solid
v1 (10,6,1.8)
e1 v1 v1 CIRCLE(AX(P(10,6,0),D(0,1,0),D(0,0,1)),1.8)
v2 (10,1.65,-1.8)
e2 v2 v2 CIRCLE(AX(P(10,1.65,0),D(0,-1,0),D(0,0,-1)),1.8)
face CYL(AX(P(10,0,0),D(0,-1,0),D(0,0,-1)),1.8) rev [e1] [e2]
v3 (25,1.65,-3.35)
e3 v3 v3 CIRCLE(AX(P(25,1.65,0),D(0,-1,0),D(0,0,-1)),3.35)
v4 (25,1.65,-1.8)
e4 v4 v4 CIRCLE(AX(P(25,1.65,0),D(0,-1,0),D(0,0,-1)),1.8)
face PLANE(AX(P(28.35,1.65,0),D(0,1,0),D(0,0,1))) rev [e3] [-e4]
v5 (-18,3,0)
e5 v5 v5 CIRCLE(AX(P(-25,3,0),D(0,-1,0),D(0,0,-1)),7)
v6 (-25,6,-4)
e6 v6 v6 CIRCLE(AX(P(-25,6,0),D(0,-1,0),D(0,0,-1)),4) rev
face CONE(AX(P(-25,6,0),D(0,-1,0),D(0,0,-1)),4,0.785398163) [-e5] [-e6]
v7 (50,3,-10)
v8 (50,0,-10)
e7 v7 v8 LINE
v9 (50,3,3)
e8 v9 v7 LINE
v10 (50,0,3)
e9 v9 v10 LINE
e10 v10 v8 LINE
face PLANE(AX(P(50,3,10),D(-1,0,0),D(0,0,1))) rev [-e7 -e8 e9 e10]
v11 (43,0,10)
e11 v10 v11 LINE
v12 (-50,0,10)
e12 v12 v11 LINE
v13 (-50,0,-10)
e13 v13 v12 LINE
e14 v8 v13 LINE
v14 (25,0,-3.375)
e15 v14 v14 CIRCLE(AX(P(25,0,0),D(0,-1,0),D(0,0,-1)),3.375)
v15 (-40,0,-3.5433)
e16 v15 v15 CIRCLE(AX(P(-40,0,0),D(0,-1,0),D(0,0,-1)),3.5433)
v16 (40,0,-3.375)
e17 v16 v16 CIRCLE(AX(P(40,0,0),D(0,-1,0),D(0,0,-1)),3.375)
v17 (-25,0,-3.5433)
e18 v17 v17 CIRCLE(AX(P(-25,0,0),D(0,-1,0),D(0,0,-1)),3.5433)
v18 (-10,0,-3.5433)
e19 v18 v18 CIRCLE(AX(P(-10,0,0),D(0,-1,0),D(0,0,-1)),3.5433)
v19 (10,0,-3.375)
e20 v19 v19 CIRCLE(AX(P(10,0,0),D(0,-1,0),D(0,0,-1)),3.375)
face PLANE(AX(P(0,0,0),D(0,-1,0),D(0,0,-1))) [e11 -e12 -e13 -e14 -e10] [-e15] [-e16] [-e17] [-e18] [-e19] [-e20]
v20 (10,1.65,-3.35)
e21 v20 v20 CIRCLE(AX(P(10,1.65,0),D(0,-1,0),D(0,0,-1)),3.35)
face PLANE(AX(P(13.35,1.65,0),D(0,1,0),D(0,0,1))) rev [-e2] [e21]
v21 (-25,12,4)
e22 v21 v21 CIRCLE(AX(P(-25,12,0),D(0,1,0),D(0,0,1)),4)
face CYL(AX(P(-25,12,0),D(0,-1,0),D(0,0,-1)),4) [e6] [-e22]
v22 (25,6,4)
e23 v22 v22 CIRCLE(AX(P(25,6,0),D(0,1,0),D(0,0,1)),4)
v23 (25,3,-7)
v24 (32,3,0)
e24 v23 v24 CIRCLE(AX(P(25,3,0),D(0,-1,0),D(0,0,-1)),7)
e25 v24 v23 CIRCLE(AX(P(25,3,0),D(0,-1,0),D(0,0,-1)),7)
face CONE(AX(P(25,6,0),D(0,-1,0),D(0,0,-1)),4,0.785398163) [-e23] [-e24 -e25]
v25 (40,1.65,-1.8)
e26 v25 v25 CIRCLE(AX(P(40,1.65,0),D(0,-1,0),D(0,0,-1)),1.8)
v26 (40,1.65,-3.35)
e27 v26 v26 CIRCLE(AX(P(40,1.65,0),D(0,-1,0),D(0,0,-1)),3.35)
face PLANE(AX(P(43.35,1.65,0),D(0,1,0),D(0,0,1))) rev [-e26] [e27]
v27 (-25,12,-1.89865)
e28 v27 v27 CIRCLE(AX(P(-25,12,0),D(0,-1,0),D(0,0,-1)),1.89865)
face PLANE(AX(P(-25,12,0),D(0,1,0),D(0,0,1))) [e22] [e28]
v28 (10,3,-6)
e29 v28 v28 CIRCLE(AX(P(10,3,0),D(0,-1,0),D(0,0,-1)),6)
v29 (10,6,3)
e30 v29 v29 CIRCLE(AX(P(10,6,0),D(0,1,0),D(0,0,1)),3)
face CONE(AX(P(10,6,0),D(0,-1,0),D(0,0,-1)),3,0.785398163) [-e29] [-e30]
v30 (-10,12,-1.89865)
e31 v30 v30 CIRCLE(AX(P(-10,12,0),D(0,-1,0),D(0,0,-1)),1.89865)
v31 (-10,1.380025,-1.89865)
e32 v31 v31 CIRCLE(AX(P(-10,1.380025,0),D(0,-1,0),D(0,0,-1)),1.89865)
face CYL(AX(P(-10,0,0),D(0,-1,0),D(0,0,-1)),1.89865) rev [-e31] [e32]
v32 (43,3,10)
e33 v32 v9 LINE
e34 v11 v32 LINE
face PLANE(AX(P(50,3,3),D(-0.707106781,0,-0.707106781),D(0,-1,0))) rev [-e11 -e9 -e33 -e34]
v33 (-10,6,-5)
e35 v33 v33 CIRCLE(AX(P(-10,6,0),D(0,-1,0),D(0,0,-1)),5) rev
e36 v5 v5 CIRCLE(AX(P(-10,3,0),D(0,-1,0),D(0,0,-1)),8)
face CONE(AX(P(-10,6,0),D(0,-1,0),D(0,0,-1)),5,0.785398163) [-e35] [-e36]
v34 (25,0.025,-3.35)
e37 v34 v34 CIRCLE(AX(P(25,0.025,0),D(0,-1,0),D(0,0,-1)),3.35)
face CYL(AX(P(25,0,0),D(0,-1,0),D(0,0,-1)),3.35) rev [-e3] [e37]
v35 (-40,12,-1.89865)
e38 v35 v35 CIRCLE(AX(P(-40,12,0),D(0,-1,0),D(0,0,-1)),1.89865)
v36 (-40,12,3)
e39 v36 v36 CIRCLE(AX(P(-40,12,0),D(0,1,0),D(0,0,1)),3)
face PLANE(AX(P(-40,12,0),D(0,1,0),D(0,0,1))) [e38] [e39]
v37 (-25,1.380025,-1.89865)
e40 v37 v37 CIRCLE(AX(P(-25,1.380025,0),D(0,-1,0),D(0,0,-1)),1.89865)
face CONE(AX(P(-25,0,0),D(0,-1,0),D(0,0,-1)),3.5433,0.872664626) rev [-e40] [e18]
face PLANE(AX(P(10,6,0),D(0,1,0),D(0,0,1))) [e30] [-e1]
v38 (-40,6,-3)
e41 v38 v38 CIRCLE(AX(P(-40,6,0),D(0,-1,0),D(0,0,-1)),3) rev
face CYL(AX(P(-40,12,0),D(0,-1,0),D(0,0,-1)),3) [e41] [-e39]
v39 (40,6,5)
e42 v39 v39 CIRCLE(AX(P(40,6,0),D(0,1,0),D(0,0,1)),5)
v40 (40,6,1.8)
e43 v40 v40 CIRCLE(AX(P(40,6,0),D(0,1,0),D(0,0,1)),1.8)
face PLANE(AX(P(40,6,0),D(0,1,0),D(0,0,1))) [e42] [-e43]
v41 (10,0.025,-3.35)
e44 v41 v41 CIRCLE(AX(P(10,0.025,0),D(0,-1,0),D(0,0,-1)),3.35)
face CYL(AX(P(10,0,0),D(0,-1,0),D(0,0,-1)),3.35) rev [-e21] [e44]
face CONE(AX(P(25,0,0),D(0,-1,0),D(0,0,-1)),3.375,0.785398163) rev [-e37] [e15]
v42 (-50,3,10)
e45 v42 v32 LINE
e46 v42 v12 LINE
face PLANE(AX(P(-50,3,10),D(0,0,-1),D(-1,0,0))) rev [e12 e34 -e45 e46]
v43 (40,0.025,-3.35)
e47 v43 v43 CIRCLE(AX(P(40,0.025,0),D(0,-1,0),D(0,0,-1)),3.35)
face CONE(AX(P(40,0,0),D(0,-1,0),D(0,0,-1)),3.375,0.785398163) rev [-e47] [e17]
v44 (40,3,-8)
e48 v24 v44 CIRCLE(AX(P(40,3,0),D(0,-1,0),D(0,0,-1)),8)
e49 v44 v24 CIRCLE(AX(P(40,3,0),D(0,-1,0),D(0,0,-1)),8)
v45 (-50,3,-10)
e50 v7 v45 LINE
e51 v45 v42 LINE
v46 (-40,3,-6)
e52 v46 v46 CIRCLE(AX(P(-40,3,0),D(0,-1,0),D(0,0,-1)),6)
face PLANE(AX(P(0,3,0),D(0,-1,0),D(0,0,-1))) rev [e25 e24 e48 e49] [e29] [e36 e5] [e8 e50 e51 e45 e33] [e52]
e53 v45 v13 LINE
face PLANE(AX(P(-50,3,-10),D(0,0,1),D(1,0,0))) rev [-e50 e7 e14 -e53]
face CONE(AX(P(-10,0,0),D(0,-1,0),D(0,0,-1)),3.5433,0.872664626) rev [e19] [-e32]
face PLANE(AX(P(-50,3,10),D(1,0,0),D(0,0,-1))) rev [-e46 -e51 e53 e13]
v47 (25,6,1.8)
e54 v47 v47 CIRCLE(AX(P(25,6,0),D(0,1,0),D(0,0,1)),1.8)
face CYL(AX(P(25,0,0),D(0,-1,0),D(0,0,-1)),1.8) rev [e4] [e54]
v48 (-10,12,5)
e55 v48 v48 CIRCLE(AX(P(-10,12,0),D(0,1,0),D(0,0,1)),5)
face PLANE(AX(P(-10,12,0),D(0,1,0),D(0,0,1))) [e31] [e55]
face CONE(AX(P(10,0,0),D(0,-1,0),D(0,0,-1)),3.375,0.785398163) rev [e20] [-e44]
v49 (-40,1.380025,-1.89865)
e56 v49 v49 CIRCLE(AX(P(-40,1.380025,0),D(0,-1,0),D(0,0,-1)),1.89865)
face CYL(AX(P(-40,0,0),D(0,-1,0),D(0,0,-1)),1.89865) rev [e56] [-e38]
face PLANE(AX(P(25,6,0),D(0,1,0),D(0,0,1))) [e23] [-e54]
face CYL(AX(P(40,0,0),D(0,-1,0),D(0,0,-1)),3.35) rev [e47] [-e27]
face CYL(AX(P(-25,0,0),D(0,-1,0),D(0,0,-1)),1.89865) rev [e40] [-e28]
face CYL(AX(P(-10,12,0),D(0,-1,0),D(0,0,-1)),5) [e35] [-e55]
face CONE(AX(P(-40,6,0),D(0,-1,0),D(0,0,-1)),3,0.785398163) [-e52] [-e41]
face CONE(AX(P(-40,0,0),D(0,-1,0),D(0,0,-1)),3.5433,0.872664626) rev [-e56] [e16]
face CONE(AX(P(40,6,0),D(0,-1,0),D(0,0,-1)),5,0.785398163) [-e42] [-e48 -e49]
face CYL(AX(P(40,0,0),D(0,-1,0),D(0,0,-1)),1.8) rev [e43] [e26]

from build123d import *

# Parameters (mm, degrees)
SKETCH1_W                                         = 100
SKETCH1_H                                         = 20
BOSS_EXTRUDE1_DEPTH                               = 3
SKETCH2_R                                         = 4
SKETCH2_R_2                                       = 3
SKETCH2_R_3                                       = 5
BOSS_EXTRUDE2_DEPTH                               = 9
CHAMFER1_SIZE                                     = 3
CSK_FOR_6_FLAT_HEAD_MACHINE_SCREW_100_D           = 3.7973
CSK_FOR_6_FLAT_HEAD_MACHINE_SCREW_100_CSINK_D     = 7.0866
CSK_FOR_6_FLAT_HEAD_MACHINE_SCREW_100_CSINK_ANGLE = 100
CSK_FOR_6_FLAT_HEAD_MACHINE_SCREW_2_D             = 3.7973
CSK_FOR_6_FLAT_HEAD_MACHINE_SCREW_2_CSINK_D       = 7.0866
CSK_FOR_6_FLAT_HEAD_MACHINE_SCREW_2_CSINK_ANGLE   = 100
CSK_FOR_6_FLAT_HEAD_MACHINE_SCREW_3_D             = 3.7973
CSK_FOR_6_FLAT_HEAD_MACHINE_SCREW_3_CSINK_D       = 7.0866
CSK_FOR_6_FLAT_HEAD_MACHINE_SCREW_3_CSINK_ANGLE   = 100
CHAMFER2_SIZE                                     = 3
CHAMFER3_SIZE                                     = 3
SKETCH14_R                                        = 3
SKETCH14_R_2                                      = 4
SKETCH14_R_3                                      = 5
BOSS_EXTRUDE3_DEPTH                               = 3
CHAMFER4_SIZE                                     = 3
LPATTERN1_COUNT                                   = 3
LPATTERN1_PITCH                                   = 15
CHAMFER5_SIZE                                     = 7


with BuildPart() as part:
    # Sketch1 → Boss-Extrude1 (new body)
    with BuildSketch(Plane(origin=(0, 0, 0), x_dir=(1, 0, 0), z_dir=(0, 1, 0))):
        Rectangle(SKETCH1_W, SKETCH1_H)
    extrude(amount=BOSS_EXTRUDE1_DEPTH)

    # Sketch2 → Boss-Extrude2 (add)
    with BuildSketch(Plane(origin=(0, 3, 0), x_dir=(1, 0, 0), z_dir=(0, 1, 0))):
        with Locations(Location((-25, 0, 0), (0, 0, 90))):
            Circle(SKETCH2_R)
        with Locations(Location((-40, 0, 0), (0, 0, 90))):
            Circle(SKETCH2_R_2)
        with Locations(Location((-10, 0, 0), (0, 0, 90))):
            Circle(SKETCH2_R_3)
    extrude(amount=BOSS_EXTRUDE2_DEPTH)

    # Chamfer1
    chamfer1_edges = [part.edges().sort_by_distance(p)[0] for p in [
        (-40, 3, 3),
    ]]
    chamfer(chamfer1_edges, length=CHAMFER1_SIZE)

    # CSK for _6 Flat Head Machine Screw _100 (through all)
    with Locations(Plane(origin=(0, 0, 0), x_dir=(-1, 0, 0), z_dir=(0, -1, 0))):
        with Locations((40, 0)):
            CounterSinkHole(CSK_FOR_6_FLAT_HEAD_MACHINE_SCREW_100_D / 2, CSK_FOR_6_FLAT_HEAD_MACHINE_SCREW_100_CSINK_D / 2, counter_sink_angle=CSK_FOR_6_FLAT_HEAD_MACHINE_SCREW_100_CSINK_ANGLE)

    # CSK for _6 Flat Head Machine Screw _ 2 (through all)
    with Locations(Plane(origin=(0, 0, 0), x_dir=(-1, 0, 0), z_dir=(0, -1, 0))):
        with Locations((25, 0)):
            CounterSinkHole(CSK_FOR_6_FLAT_HEAD_MACHINE_SCREW_2_D / 2, CSK_FOR_6_FLAT_HEAD_MACHINE_SCREW_2_CSINK_D / 2, counter_sink_angle=CSK_FOR_6_FLAT_HEAD_MACHINE_SCREW_2_CSINK_ANGLE)

    # CSK for _6 Flat Head Machine Screw _ 3 (through all)
    with Locations(Plane(origin=(0, 0, 0), x_dir=(-1, 0, 0), z_dir=(0, -1, 0))):
        with Locations((10, 0)):
            CounterSinkHole(CSK_FOR_6_FLAT_HEAD_MACHINE_SCREW_3_D / 2, CSK_FOR_6_FLAT_HEAD_MACHINE_SCREW_3_CSINK_D / 2, counter_sink_angle=CSK_FOR_6_FLAT_HEAD_MACHINE_SCREW_3_CSINK_ANGLE)

    # Chamfer2
    chamfer2_edges = [part.edges().sort_by_distance(p)[0] for p in [
        (-25, 3, 4),
    ]]
    chamfer(chamfer2_edges, length=CHAMFER2_SIZE)

    # Chamfer3
    chamfer3_edges = [part.edges().sort_by_distance(p)[0] for p in [
        (-10, 3, 5),
    ]]
    chamfer(chamfer3_edges, length=CHAMFER3_SIZE - 0.0001)  # a hair under: the kernel refuses the full size

    # Sketch14 → Boss-Extrude3 (add)
    with BuildSketch(Plane(origin=(0, 3, 0), x_dir=(1, 0, 0), z_dir=(0, 1, 0))):
        with Locations(Location((10, 0, 0), (0, 0, 90))):
            Circle(SKETCH14_R)
        with Locations(Location((25, 0, 0), (0, 0, 90))):
            Circle(SKETCH14_R_2)
        with Locations(Location((40, 0, 0), (0, 0, 90))):
            Circle(SKETCH14_R_3)
    extrude(amount=BOSS_EXTRUDE3_DEPTH)

    # Chamfer4
    chamfer4_edges = [part.edges().sort_by_distance(p)[0] for p in [
        (10, 3, 3),
        (25, 3, 4),
        (40, 3, 5),
    ]]
    chamfer(chamfer4_edges, length=CHAMFER4_SIZE - 0.0001)  # a hair under: the kernel refuses the full size

    # Sketch18 → CBORE for M3 SBHCS1 (revolve, cut)
    with BuildSketch(Plane(origin=(10, 0, 0), x_dir=(0, 0, -1), z_dir=(1, 0, 0))):
        Polygon((0, 0), (0, 12), (1.8, 12), (1.8, 1.65), (3.35, 1.65), (3.35, 0.025), (3.375, 0), align=None)
    cbore_for_m3_sbhcs1 = revolve(axis=Axis((10, -6.35, 0), (0, 1, 0)), mode=Mode.SUBTRACT)

    # LPattern1: CBORE for M3 SBHCS1 ×3
    with Locations(*[(i * LPATTERN1_PITCH, 0, 0) for i in range(1, LPATTERN1_COUNT)]):
        add(cbore_for_m3_sbhcs1, mode=Mode.SUBTRACT)

    # Chamfer5
    chamfer5_edges = [part.edges().sort_by_distance(p)[0] for p in [
        (50, 1.5, 10),
    ]]
    chamfer(chamfer5_edges, length=CHAMFER5_SIZE)


solid = part.part
